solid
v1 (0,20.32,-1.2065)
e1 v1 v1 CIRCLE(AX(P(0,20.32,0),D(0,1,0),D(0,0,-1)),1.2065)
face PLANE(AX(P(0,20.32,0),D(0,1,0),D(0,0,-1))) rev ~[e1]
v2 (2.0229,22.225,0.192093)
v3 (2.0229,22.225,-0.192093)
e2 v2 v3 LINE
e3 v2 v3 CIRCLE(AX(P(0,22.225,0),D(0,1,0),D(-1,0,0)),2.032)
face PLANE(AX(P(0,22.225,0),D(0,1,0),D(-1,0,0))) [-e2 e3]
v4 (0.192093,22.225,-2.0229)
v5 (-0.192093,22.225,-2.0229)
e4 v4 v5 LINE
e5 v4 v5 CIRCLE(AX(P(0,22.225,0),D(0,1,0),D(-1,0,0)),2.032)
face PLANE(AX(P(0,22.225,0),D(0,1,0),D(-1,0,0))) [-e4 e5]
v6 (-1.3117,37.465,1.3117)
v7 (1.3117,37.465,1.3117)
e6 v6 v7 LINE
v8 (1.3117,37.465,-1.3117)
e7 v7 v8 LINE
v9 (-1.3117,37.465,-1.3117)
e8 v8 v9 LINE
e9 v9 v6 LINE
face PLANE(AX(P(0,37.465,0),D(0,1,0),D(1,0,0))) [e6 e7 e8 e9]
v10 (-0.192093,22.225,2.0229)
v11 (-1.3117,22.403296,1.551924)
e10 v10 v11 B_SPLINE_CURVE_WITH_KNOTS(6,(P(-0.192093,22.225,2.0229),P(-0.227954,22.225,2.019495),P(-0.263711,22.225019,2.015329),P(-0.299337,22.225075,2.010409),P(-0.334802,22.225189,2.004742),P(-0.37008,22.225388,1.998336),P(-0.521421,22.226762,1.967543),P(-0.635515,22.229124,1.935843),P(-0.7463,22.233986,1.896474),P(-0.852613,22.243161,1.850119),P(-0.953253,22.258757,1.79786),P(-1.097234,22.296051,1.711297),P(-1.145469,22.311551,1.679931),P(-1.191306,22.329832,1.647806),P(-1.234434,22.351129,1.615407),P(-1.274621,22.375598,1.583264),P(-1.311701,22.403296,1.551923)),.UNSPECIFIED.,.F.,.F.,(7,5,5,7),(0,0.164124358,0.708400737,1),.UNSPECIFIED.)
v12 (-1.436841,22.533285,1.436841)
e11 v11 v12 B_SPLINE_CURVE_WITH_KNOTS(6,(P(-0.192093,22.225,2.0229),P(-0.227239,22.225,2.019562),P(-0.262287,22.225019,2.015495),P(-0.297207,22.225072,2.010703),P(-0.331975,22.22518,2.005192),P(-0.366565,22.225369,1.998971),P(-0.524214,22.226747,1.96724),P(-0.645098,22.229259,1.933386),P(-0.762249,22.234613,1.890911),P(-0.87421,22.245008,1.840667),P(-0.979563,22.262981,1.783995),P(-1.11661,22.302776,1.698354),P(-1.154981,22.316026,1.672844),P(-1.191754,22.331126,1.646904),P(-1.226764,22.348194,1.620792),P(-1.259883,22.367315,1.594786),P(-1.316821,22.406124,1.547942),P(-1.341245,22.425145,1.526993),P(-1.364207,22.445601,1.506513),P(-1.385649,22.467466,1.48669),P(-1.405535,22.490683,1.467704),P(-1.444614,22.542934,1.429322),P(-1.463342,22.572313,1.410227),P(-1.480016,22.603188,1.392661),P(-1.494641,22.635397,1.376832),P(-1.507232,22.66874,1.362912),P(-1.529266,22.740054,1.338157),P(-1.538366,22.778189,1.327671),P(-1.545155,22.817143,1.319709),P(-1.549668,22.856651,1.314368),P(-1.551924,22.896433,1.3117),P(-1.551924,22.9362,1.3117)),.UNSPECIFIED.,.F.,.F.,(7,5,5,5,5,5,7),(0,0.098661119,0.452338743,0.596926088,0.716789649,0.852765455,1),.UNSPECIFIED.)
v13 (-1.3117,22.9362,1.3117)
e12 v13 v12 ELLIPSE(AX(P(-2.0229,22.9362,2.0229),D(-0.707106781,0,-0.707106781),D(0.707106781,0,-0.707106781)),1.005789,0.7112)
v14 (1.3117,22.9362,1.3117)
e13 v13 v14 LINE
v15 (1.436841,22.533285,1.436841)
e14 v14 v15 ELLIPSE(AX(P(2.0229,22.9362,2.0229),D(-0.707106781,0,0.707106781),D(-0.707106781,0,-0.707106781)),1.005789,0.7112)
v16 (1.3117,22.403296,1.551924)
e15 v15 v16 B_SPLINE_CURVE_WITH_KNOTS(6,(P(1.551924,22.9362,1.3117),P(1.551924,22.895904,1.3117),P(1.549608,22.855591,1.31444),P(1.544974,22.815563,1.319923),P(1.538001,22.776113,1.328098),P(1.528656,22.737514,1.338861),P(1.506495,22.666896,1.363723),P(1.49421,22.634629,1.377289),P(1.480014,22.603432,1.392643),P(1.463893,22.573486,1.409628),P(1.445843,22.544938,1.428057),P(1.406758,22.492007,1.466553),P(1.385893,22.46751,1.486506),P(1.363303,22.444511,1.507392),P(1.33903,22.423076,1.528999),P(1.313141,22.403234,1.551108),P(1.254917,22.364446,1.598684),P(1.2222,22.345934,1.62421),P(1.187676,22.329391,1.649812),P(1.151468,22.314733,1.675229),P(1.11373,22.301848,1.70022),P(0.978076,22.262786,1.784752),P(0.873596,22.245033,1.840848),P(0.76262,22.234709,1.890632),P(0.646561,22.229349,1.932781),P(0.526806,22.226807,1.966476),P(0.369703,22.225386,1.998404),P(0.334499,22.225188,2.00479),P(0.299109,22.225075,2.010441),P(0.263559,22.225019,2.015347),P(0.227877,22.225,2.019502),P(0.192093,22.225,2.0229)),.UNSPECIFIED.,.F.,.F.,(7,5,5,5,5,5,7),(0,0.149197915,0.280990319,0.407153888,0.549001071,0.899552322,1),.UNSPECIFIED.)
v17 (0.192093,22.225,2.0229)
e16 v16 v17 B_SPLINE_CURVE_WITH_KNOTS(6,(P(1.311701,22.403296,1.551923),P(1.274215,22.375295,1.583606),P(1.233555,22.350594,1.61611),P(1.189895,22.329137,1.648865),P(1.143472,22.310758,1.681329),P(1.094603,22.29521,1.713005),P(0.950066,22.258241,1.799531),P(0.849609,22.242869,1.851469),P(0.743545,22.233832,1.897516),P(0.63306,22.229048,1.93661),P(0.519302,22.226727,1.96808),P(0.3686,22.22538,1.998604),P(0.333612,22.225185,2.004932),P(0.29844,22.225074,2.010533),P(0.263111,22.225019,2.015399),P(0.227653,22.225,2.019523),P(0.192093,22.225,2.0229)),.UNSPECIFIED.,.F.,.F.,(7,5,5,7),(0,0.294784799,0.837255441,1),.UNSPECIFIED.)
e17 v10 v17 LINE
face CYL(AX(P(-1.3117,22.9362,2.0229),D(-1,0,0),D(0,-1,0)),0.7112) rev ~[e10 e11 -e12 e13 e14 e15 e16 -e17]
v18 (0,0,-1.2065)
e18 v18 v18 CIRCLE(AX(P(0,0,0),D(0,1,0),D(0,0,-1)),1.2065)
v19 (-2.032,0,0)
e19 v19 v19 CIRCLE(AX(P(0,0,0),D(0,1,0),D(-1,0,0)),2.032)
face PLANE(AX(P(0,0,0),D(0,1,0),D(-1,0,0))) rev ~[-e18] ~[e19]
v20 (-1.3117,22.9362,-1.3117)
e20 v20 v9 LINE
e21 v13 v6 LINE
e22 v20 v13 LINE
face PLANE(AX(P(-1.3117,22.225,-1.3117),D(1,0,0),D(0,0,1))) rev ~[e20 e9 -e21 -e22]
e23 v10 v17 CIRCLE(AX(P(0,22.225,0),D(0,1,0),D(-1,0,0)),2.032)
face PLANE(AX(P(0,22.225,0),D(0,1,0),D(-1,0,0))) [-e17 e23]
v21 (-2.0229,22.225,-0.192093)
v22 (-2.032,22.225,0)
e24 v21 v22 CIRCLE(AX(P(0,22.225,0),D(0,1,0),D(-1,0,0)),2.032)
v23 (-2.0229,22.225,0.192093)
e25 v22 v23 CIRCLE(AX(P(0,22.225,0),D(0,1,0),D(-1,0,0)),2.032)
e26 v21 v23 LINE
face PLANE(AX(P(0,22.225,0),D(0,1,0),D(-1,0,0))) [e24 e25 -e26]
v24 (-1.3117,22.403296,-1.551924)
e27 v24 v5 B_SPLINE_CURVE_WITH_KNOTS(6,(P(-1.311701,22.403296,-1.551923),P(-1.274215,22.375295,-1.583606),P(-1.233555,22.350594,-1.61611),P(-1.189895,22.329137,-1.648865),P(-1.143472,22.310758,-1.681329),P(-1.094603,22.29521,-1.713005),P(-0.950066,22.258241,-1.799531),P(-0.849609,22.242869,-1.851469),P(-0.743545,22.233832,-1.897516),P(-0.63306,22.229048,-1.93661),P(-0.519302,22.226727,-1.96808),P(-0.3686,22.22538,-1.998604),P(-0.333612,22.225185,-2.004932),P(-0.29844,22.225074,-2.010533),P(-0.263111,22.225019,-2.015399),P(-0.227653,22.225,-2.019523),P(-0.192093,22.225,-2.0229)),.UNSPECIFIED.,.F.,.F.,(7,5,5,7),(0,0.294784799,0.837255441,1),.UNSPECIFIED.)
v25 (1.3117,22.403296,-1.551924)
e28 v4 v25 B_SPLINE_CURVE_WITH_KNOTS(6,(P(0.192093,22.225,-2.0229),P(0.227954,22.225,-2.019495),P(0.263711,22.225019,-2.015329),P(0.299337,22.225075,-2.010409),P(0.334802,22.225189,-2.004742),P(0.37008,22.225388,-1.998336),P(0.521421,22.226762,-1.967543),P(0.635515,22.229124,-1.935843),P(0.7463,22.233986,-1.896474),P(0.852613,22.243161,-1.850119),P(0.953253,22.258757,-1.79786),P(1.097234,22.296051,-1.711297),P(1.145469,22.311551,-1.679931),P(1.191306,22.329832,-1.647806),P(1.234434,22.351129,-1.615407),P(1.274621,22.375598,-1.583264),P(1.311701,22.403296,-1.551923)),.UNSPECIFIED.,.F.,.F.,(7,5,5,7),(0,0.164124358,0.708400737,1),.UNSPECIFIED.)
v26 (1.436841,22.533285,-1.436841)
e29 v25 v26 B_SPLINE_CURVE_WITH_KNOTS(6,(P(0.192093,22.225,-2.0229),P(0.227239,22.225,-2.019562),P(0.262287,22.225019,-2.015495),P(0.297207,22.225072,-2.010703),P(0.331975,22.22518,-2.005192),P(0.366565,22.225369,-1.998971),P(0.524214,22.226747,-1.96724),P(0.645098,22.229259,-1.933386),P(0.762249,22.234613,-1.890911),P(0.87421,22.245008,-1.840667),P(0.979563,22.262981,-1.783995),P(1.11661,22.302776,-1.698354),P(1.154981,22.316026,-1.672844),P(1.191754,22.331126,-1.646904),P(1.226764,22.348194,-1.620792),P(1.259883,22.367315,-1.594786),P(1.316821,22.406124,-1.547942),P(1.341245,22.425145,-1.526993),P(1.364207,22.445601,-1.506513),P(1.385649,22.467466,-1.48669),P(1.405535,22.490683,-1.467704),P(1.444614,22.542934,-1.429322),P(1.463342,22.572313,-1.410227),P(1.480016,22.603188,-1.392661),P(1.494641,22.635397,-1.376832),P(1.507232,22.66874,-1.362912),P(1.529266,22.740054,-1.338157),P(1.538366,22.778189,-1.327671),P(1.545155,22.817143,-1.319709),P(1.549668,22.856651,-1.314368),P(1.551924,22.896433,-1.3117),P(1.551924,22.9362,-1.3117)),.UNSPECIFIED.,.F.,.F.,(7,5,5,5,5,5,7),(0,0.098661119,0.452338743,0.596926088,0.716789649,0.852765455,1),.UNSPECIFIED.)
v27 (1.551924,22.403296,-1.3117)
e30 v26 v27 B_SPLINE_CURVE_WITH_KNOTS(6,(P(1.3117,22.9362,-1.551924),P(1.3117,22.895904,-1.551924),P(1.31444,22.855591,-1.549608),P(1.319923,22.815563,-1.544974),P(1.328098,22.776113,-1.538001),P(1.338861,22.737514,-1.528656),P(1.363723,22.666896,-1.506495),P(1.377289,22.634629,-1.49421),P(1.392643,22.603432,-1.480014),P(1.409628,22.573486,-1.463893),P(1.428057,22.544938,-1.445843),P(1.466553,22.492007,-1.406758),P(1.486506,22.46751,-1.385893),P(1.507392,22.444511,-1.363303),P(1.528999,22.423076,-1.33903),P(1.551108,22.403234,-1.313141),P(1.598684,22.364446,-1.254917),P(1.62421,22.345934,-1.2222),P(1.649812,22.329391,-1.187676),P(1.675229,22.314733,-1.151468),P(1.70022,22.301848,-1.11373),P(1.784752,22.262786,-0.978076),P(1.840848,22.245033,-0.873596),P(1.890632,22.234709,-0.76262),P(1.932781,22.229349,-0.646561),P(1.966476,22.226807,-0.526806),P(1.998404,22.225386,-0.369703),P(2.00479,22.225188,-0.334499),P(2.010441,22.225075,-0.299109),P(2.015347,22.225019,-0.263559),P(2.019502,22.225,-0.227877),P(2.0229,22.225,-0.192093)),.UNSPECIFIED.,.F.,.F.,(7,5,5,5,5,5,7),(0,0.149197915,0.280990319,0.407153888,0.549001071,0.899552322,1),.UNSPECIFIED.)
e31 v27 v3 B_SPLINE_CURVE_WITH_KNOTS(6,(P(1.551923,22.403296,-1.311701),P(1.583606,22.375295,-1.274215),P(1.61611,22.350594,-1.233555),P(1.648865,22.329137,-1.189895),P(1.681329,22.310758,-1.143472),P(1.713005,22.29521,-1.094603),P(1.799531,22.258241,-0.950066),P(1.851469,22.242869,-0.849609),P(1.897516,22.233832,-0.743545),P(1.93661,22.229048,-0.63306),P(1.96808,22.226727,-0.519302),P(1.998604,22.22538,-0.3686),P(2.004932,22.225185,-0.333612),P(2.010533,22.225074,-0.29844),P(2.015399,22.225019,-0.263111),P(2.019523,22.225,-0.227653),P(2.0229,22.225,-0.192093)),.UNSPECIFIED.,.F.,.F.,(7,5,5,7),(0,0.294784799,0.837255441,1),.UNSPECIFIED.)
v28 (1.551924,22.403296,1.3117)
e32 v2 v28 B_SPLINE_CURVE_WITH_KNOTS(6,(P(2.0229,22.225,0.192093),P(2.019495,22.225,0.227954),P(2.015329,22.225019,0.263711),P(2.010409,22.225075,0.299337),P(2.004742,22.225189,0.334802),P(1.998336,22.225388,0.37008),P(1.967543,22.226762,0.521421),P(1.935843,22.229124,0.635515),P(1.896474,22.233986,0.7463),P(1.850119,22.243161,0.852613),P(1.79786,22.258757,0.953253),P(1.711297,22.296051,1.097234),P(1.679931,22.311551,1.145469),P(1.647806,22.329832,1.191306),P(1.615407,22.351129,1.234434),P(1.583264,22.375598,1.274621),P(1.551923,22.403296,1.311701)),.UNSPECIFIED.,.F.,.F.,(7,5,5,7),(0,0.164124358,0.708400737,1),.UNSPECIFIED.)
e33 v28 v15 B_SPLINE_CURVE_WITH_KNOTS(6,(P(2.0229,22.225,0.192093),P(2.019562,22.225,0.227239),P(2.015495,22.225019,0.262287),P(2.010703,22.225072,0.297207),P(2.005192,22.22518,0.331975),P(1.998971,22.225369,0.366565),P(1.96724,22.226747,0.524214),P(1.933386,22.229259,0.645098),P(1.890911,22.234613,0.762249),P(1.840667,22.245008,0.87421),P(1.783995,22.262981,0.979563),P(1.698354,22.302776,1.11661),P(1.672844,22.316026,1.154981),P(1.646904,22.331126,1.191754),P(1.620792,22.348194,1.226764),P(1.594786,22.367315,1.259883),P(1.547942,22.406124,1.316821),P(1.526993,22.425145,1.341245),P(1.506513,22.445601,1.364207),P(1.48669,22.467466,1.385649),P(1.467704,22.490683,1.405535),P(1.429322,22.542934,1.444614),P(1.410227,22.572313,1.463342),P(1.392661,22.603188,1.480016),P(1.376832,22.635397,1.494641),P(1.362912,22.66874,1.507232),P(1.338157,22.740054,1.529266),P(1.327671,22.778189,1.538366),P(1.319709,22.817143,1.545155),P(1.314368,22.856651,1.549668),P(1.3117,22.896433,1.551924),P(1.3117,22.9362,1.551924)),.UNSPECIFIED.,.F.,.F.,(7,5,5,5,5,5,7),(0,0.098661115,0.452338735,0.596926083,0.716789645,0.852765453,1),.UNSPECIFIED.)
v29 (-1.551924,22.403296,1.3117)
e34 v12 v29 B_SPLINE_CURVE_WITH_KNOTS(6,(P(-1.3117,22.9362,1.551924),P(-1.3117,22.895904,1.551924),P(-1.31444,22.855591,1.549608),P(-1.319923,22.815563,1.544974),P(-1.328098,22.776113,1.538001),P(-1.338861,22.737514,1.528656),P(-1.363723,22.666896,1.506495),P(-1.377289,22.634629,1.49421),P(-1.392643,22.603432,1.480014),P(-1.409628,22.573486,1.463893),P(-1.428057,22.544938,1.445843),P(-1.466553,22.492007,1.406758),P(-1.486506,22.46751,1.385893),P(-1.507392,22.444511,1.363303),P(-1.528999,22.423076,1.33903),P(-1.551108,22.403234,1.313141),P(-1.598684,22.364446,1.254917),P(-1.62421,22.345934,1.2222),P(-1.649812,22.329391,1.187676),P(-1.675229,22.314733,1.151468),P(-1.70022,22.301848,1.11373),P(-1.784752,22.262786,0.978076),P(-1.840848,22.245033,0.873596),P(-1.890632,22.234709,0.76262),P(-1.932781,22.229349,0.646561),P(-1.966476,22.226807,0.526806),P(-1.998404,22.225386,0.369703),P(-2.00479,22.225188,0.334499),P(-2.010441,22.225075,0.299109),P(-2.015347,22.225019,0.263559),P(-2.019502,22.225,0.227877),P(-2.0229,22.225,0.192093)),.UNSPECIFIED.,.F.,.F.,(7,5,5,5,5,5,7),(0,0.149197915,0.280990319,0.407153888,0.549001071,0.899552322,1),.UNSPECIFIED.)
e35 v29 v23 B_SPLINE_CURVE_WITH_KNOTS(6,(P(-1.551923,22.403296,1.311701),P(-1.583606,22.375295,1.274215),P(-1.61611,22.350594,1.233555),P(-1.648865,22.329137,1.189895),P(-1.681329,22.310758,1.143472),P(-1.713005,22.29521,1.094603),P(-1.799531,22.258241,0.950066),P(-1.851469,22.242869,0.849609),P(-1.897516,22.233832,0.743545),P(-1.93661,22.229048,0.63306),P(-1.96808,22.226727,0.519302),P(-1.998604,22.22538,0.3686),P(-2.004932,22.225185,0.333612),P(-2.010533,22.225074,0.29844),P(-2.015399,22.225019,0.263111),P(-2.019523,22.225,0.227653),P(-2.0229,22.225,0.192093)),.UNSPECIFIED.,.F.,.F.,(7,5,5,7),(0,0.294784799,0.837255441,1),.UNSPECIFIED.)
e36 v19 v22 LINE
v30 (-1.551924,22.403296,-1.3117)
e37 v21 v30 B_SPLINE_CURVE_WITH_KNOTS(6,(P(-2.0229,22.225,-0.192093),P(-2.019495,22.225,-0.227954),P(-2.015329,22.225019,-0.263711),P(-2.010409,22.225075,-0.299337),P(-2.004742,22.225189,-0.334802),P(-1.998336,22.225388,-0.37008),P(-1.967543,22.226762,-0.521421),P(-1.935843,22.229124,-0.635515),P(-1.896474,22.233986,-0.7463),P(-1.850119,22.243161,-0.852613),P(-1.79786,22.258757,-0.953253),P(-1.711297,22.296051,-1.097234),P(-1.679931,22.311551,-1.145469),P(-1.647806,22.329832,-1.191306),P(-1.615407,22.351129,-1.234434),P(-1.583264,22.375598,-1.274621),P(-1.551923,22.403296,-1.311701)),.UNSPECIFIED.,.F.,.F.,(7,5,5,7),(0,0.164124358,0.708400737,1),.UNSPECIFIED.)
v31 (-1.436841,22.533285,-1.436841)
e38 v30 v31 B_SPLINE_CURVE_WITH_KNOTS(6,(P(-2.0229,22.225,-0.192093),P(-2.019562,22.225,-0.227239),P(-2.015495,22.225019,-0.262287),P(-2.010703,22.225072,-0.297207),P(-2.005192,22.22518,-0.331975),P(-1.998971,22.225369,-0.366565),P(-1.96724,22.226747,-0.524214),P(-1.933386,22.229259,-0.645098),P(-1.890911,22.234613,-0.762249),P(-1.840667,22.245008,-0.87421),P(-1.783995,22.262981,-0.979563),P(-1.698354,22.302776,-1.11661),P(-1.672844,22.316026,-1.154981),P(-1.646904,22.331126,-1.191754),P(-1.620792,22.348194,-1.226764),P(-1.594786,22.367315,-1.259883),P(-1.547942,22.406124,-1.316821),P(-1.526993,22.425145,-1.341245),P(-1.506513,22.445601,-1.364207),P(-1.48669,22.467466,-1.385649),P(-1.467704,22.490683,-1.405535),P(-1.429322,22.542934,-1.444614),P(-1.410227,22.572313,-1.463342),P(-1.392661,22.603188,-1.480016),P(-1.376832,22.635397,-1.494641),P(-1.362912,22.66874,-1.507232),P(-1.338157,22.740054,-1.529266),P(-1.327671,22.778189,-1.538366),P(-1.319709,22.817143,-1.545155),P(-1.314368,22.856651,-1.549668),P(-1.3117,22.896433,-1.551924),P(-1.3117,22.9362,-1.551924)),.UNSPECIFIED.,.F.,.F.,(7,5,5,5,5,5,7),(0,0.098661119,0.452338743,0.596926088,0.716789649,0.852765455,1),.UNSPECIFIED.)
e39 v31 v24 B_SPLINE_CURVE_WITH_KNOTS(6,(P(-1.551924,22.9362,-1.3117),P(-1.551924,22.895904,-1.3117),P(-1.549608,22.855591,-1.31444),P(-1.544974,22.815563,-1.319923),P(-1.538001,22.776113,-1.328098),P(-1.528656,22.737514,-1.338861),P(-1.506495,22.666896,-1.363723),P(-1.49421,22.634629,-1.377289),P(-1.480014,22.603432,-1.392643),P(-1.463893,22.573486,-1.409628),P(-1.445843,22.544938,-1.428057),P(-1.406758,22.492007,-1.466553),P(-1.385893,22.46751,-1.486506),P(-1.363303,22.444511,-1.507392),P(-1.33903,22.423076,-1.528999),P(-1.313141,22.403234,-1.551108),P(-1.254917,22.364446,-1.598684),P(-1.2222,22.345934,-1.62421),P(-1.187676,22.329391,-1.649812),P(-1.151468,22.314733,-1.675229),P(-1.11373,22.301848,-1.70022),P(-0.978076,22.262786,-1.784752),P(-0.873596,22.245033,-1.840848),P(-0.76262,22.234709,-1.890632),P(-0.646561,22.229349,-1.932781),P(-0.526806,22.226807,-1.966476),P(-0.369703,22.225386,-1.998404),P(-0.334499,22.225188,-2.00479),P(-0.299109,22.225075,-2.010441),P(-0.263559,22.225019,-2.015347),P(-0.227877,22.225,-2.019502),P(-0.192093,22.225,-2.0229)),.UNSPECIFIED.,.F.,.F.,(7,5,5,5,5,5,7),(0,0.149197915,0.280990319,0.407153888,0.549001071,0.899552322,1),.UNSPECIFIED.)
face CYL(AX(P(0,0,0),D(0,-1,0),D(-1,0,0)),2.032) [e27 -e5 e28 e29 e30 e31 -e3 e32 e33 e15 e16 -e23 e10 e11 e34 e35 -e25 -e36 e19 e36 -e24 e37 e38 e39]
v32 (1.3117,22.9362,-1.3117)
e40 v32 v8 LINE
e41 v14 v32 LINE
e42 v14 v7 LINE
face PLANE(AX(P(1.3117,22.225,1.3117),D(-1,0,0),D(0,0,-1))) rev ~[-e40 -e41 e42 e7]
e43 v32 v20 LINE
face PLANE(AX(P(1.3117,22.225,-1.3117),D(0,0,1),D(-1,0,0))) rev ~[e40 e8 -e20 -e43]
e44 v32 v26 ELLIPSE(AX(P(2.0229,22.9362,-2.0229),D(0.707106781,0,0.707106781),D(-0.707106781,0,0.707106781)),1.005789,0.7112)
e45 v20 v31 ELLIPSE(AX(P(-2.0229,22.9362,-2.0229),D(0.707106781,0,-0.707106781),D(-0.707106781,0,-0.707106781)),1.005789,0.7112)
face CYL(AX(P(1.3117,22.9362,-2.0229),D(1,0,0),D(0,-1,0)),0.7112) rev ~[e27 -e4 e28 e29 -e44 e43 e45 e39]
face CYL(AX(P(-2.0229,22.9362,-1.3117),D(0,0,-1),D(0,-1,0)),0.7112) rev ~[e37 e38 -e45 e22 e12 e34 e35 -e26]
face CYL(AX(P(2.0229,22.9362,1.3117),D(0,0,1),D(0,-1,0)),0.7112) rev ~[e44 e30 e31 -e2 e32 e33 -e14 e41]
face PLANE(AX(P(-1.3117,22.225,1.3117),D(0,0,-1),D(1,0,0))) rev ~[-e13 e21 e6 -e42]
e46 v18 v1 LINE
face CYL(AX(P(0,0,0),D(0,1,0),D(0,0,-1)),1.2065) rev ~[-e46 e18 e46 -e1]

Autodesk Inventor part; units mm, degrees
ref_plane "YZ Plane" through (0, 0, 0) normal (1, 0, 0) x (0, 1, 0)
ref_plane "XZ Plane" through (0, 0, 0) normal (0, 1, 0) x (-1, 0, 0)
ref_plane "XY Plane" through (0, 0, 0) normal (0, 0, 1) x (1, 0, 0)
sketch "Sketch1" plane through (0, 0, 0) normal (0, 1, 0) x (-1, 0, 0)
  circle A0 centre (0, 0) radius 2.032
  dimension "d0" = 4.064
extrude "Extrusion1" add sketch "Sketch1" along normal blind 22.225
sketch "Sketch2" plane through (0, 22.225, 0) normal (0, 1, 0) x (1, 0, 0)
  line L0 (-1.3117, -1.3117) -> (1.3117, -1.3117)
  line L1 (1.3117, -1.3117) -> (1.3117, 1.3117)
  line L2 (1.3117, 1.3117) -> (-1.3117, 1.3117)
  line L3 (-1.3117, 1.3117) -> (-1.3117, -1.3117)
  point P0 (0, 0)
  point P1 (-1.3117, 0)
  point P2 (0, -1.3117)
  dimension "d3" = 2.6234
  dimension "d4" = 2.6234
extrude "Extrusion2" add sketch "Sketch2" along normal blind 15.24
sketch "Sketch3" plane through (0, 0, 0) normal (0, -1, 0) x (1, 0, 0)
  point P0 (0, 0)
  point P1 (0, 0)
hole "Hole1" at (0, 0, 0) direction (0, 1, 0) diameter 2.413 depth 20.32
fillet "Fillet1" radius 0.7112 4 edges at (0, 22.225, 1.3117) (1.3117, 22.225, 0) (0, 22.225, -1.3117) (-1.3117, 22.225, 0)
equation "\"d4\" = d3"
properties part number "shaft_adapter_v2" material "ABS Plastic"
